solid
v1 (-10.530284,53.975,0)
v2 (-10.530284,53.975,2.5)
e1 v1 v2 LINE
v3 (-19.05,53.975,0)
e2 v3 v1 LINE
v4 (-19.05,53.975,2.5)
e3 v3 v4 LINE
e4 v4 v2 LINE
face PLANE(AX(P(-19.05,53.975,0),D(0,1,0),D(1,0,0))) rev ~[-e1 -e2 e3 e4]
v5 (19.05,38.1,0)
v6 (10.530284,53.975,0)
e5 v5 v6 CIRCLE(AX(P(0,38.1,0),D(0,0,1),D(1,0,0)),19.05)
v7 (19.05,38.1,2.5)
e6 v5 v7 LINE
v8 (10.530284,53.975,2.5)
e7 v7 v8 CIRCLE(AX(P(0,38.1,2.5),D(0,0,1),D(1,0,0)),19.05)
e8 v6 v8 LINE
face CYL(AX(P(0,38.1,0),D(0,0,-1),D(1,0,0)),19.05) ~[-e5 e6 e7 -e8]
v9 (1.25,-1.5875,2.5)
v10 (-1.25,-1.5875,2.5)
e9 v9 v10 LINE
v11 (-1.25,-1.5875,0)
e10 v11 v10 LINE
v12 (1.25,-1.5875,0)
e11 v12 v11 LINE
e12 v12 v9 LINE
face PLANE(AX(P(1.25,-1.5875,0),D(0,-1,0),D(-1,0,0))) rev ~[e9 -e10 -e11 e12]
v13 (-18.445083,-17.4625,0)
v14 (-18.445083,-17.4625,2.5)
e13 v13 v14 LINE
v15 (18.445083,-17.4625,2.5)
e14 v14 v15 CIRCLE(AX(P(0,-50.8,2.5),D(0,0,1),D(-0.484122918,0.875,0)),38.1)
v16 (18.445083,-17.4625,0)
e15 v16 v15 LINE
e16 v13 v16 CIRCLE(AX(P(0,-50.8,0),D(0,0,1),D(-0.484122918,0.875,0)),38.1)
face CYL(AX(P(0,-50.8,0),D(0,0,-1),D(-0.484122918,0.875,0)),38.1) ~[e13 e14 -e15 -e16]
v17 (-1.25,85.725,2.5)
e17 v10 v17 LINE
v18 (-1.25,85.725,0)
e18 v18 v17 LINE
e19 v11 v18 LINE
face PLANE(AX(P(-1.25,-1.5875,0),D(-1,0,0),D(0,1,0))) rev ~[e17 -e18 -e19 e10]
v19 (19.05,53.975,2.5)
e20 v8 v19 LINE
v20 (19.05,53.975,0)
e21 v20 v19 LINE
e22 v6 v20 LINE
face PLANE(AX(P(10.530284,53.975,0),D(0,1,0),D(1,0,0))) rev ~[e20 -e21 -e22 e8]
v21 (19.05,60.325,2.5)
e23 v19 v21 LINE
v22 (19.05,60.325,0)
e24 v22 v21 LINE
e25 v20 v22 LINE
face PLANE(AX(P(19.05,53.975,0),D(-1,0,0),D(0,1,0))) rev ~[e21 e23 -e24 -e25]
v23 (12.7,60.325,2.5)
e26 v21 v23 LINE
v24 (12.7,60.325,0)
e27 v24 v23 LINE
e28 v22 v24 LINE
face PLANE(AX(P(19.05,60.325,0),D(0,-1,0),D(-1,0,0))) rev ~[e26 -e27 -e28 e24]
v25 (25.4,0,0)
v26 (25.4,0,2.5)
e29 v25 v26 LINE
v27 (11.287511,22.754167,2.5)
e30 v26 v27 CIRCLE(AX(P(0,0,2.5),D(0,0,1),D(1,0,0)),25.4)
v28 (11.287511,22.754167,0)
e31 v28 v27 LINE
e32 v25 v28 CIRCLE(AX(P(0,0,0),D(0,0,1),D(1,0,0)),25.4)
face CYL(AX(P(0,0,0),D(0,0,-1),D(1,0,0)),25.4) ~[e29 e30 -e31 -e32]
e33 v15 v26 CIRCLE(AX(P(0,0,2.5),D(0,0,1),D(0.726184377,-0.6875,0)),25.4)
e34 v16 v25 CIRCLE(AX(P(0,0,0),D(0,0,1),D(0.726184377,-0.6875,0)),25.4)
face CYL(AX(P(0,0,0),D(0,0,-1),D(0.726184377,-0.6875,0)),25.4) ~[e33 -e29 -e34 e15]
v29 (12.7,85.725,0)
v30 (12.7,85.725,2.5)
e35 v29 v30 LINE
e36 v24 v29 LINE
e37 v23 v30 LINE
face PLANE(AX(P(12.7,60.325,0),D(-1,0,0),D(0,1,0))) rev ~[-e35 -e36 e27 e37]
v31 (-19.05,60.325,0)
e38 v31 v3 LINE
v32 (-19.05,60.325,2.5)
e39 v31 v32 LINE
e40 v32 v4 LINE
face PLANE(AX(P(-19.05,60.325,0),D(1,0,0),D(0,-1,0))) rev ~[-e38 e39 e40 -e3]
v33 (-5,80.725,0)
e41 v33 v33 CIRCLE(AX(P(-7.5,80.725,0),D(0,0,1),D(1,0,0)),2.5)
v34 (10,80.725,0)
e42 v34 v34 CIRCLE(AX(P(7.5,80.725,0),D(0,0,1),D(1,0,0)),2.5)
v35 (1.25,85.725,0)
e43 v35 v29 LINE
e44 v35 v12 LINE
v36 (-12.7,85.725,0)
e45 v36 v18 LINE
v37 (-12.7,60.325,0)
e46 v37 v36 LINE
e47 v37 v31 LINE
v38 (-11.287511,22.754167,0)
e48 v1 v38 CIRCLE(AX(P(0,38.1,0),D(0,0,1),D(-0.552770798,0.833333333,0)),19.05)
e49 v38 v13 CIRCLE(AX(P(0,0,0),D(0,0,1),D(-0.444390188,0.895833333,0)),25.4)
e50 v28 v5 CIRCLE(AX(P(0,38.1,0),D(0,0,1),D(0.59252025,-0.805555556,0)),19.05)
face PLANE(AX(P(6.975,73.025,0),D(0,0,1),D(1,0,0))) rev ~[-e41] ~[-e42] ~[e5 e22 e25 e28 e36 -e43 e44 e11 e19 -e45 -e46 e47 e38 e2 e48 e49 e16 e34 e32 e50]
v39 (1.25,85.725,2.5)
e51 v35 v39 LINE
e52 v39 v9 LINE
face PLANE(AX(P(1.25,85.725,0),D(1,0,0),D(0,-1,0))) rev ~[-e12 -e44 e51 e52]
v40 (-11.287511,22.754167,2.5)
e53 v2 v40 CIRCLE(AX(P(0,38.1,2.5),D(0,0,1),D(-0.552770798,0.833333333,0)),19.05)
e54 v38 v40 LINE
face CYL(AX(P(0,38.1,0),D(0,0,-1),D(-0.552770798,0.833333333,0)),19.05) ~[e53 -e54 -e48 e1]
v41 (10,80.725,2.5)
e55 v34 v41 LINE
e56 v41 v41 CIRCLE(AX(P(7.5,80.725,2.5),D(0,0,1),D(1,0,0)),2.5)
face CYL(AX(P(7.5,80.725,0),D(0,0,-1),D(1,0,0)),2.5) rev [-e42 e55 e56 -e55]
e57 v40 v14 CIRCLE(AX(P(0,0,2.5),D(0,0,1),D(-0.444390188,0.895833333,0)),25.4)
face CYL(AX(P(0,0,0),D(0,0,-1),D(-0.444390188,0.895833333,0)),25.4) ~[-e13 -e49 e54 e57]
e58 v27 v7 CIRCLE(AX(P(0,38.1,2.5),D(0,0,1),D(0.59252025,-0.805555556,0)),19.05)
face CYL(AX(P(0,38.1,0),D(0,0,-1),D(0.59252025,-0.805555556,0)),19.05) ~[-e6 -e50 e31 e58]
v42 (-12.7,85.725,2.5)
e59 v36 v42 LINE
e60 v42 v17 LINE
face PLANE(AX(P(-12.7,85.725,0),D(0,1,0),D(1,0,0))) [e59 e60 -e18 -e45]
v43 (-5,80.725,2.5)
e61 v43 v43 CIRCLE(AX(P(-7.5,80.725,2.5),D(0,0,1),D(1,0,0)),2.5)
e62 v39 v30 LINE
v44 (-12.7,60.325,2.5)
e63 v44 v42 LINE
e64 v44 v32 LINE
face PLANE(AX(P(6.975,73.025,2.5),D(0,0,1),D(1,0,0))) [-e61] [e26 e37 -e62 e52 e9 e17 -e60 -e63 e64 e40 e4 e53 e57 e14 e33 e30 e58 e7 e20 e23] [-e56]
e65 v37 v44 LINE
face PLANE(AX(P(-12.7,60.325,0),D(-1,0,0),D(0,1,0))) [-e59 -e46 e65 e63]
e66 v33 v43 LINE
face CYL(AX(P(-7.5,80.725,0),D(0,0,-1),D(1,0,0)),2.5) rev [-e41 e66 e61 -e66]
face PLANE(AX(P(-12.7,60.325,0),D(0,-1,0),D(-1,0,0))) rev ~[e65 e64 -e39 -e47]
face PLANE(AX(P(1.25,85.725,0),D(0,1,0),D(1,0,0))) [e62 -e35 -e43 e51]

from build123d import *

# Parameters (mm, degrees)
F0_W     = 11.45
F0_H     = 25.4
F0_R     = 2.5
F1_DEPTH = 2.5


# Not quite as in the source:
# - a feature names something its author has since deleted; it is built from what else it names


with BuildPart() as f1:
    # F0 (on Top) → F1 (new body)
    with BuildSketch(Plane.XY):
        with Locations((6.975, 73.025)):
            Rectangle(F0_W, F0_H)
        with Locations((7.5, 80.725)):
            Circle(F0_R, mode=Mode.SUBTRACT)
        with Locations((-6.975, 73.025)):
            Rectangle(F0_W, F0_H)
        with Locations((-7.5, 80.725)):
            Circle(F0_R, mode=Mode.SUBTRACT)
        with BuildLine():
            ThreePointArc((-10.5302837094, 53.975), (-6.0950122474, 56.1486377797), (-1.25, 57.1089452627))
            Line((-1.25, 57.1089452627), (-1.25, 60.325))
            Line((-1.25, 60.325), (-12.7, 60.325))
            Line((-12.7, 60.325), (-19.05, 60.325))
            Line((-19.05, 60.325), (-19.05, 53.975))
            Line((-19.05, 53.975), (-10.5302837094, 53.975))
        make_face()
        with BuildLine():
            ThreePointArc((1.25, 57.1089452627), (6.0950122474, 56.1486377797), (10.5302837094, 53.975))
            Line((10.5302837094, 53.975), (19.05, 53.975))
            Line((19.05, 53.975), (19.05, 60.325))
            Line((19.05, 60.325), (12.7, 60.325))
            Line((12.7, 60.325), (1.25, 60.325))
            Line((1.25, 60.325), (1.25, 57.1089452627))
        make_face()
        with BuildLine():
            Line((1.25, 53.975), (10.5302837094, 53.975))
            ThreePointArc((10.5302837094, 53.975), (6.0950122474, 56.1486377797), (1.25, 57.1089452627))
            Line((1.25, 57.1089452627), (1.25, 53.975))
        make_face()
        with BuildLine():
            Line((-1.25, 53.975), (-1.25, 57.1089452627))
            ThreePointArc((-1.25, 57.1089452627), (-6.0950122474, 56.1486377797), (-10.5302837094, 53.975))
            Line((-10.5302837094, 53.975), (-1.25, 53.975))
        make_face()
        with BuildLine():
            Line((-1.25, 25.3692234804), (-1.25, 53.975))
            Line((-1.25, 53.975), (-10.5302837094, 53.975))
            ThreePointArc((-10.5302837094, 53.975), (-19.0443993724, 38.5619010114), (-11.2875107666, 22.7541666667))
            ThreePointArc((-11.2875107666, 22.7541666667), (-6.4036649343, 24.5795255326), (-1.25, 25.3692234804))
        make_face()
        with BuildLine():
            ThreePointArc((11.2875107666, 22.7541666667), (16.9989643817, 29.5012960309), (19.05, 38.1))
            ThreePointArc((19.05, 38.1), (16.785475934, 47.1083460007), (10.5302837094, 53.975))
            Line((10.5302837094, 53.975), (1.25, 53.975))
            Line((1.25, 53.975), (1.25, 25.3692234804))
            ThreePointArc((1.25, 25.3692234804), (6.4036649343, 24.5795255326), (11.2875107666, 22.7541666667))
        make_face()
        with BuildLine():
            ThreePointArc((-11.2875107666, 22.7541666667), (-6.5308415466, 20.204452825), (-1.25, 19.0910547373))
            Line((-1.25, 19.0910547373), (-1.25, 25.3692234804))
            ThreePointArc((-1.25, 25.3692234804), (-6.4036649343, 24.5795255326), (-11.2875107666, 22.7541666667))
        make_face()
        with BuildLine():
            ThreePointArc((1.25, 19.0910547373), (6.5308415466, 20.204452825), (11.2875107666, 22.7541666667))
            ThreePointArc((11.2875107666, 22.7541666667), (6.4036649343, 24.5795255326), (1.25, 25.3692234804))
            Line((1.25, 25.3692234804), (1.25, 19.0910547373))
        make_face()
        with BuildLine():
            ThreePointArc((-18.4450831863, -17.4625), (0, -25.4), (18.4450831863, -17.4625))
            ThreePointArc((18.4450831863, -17.4625), (0, -12.7), (-18.4450831863, -17.4625))
        make_face()
        with BuildLine():
            ThreePointArc((38.1, -50.8), (32.820478892, -31.4499052896), (18.4450831863, -17.4625))
            ThreePointArc((18.4450831863, -17.4625), (0, -25.4), (-18.4450831863, -17.4625))
            ThreePointArc((-18.4450831863, -17.4625), (-19.3500947104, -83.620478892), (38.1, -50.8))
        make_face()
        with BuildLine():
            ThreePointArc((25.4, 0), (21.5854438624, 13.3876291129), (11.2875107666, 22.7541666667))
            ThreePointArc((11.2875107666, 22.7541666667), (6.5308415466, 20.204452825), (1.25, 19.0910547373))
            Line((1.25, 19.0910547373), (1.25, -1.5875))
            Line((1.25, -1.5875), (-1.25, -1.5875))
            Line((-1.25, -1.5875), (-1.25, 19.0910547373))
            ThreePointArc((-1.25, 19.0910547373), (-6.5308415466, 20.204452825), (-11.2875107666, 22.7541666667))
            ThreePointArc((-11.2875107666, 22.7541666667), (-25.0070361146, 4.4506341979), (-18.4450831863, -17.4625))
            ThreePointArc((-18.4450831863, -17.4625), (0, -12.7), (18.4450831863, -17.4625))
            ThreePointArc((18.4450831863, -17.4625), (23.5972997707, -9.3982681135), (25.4, 0))
        make_face()
    extrude(amount=F1_DEPTH)


solid = f1.part
